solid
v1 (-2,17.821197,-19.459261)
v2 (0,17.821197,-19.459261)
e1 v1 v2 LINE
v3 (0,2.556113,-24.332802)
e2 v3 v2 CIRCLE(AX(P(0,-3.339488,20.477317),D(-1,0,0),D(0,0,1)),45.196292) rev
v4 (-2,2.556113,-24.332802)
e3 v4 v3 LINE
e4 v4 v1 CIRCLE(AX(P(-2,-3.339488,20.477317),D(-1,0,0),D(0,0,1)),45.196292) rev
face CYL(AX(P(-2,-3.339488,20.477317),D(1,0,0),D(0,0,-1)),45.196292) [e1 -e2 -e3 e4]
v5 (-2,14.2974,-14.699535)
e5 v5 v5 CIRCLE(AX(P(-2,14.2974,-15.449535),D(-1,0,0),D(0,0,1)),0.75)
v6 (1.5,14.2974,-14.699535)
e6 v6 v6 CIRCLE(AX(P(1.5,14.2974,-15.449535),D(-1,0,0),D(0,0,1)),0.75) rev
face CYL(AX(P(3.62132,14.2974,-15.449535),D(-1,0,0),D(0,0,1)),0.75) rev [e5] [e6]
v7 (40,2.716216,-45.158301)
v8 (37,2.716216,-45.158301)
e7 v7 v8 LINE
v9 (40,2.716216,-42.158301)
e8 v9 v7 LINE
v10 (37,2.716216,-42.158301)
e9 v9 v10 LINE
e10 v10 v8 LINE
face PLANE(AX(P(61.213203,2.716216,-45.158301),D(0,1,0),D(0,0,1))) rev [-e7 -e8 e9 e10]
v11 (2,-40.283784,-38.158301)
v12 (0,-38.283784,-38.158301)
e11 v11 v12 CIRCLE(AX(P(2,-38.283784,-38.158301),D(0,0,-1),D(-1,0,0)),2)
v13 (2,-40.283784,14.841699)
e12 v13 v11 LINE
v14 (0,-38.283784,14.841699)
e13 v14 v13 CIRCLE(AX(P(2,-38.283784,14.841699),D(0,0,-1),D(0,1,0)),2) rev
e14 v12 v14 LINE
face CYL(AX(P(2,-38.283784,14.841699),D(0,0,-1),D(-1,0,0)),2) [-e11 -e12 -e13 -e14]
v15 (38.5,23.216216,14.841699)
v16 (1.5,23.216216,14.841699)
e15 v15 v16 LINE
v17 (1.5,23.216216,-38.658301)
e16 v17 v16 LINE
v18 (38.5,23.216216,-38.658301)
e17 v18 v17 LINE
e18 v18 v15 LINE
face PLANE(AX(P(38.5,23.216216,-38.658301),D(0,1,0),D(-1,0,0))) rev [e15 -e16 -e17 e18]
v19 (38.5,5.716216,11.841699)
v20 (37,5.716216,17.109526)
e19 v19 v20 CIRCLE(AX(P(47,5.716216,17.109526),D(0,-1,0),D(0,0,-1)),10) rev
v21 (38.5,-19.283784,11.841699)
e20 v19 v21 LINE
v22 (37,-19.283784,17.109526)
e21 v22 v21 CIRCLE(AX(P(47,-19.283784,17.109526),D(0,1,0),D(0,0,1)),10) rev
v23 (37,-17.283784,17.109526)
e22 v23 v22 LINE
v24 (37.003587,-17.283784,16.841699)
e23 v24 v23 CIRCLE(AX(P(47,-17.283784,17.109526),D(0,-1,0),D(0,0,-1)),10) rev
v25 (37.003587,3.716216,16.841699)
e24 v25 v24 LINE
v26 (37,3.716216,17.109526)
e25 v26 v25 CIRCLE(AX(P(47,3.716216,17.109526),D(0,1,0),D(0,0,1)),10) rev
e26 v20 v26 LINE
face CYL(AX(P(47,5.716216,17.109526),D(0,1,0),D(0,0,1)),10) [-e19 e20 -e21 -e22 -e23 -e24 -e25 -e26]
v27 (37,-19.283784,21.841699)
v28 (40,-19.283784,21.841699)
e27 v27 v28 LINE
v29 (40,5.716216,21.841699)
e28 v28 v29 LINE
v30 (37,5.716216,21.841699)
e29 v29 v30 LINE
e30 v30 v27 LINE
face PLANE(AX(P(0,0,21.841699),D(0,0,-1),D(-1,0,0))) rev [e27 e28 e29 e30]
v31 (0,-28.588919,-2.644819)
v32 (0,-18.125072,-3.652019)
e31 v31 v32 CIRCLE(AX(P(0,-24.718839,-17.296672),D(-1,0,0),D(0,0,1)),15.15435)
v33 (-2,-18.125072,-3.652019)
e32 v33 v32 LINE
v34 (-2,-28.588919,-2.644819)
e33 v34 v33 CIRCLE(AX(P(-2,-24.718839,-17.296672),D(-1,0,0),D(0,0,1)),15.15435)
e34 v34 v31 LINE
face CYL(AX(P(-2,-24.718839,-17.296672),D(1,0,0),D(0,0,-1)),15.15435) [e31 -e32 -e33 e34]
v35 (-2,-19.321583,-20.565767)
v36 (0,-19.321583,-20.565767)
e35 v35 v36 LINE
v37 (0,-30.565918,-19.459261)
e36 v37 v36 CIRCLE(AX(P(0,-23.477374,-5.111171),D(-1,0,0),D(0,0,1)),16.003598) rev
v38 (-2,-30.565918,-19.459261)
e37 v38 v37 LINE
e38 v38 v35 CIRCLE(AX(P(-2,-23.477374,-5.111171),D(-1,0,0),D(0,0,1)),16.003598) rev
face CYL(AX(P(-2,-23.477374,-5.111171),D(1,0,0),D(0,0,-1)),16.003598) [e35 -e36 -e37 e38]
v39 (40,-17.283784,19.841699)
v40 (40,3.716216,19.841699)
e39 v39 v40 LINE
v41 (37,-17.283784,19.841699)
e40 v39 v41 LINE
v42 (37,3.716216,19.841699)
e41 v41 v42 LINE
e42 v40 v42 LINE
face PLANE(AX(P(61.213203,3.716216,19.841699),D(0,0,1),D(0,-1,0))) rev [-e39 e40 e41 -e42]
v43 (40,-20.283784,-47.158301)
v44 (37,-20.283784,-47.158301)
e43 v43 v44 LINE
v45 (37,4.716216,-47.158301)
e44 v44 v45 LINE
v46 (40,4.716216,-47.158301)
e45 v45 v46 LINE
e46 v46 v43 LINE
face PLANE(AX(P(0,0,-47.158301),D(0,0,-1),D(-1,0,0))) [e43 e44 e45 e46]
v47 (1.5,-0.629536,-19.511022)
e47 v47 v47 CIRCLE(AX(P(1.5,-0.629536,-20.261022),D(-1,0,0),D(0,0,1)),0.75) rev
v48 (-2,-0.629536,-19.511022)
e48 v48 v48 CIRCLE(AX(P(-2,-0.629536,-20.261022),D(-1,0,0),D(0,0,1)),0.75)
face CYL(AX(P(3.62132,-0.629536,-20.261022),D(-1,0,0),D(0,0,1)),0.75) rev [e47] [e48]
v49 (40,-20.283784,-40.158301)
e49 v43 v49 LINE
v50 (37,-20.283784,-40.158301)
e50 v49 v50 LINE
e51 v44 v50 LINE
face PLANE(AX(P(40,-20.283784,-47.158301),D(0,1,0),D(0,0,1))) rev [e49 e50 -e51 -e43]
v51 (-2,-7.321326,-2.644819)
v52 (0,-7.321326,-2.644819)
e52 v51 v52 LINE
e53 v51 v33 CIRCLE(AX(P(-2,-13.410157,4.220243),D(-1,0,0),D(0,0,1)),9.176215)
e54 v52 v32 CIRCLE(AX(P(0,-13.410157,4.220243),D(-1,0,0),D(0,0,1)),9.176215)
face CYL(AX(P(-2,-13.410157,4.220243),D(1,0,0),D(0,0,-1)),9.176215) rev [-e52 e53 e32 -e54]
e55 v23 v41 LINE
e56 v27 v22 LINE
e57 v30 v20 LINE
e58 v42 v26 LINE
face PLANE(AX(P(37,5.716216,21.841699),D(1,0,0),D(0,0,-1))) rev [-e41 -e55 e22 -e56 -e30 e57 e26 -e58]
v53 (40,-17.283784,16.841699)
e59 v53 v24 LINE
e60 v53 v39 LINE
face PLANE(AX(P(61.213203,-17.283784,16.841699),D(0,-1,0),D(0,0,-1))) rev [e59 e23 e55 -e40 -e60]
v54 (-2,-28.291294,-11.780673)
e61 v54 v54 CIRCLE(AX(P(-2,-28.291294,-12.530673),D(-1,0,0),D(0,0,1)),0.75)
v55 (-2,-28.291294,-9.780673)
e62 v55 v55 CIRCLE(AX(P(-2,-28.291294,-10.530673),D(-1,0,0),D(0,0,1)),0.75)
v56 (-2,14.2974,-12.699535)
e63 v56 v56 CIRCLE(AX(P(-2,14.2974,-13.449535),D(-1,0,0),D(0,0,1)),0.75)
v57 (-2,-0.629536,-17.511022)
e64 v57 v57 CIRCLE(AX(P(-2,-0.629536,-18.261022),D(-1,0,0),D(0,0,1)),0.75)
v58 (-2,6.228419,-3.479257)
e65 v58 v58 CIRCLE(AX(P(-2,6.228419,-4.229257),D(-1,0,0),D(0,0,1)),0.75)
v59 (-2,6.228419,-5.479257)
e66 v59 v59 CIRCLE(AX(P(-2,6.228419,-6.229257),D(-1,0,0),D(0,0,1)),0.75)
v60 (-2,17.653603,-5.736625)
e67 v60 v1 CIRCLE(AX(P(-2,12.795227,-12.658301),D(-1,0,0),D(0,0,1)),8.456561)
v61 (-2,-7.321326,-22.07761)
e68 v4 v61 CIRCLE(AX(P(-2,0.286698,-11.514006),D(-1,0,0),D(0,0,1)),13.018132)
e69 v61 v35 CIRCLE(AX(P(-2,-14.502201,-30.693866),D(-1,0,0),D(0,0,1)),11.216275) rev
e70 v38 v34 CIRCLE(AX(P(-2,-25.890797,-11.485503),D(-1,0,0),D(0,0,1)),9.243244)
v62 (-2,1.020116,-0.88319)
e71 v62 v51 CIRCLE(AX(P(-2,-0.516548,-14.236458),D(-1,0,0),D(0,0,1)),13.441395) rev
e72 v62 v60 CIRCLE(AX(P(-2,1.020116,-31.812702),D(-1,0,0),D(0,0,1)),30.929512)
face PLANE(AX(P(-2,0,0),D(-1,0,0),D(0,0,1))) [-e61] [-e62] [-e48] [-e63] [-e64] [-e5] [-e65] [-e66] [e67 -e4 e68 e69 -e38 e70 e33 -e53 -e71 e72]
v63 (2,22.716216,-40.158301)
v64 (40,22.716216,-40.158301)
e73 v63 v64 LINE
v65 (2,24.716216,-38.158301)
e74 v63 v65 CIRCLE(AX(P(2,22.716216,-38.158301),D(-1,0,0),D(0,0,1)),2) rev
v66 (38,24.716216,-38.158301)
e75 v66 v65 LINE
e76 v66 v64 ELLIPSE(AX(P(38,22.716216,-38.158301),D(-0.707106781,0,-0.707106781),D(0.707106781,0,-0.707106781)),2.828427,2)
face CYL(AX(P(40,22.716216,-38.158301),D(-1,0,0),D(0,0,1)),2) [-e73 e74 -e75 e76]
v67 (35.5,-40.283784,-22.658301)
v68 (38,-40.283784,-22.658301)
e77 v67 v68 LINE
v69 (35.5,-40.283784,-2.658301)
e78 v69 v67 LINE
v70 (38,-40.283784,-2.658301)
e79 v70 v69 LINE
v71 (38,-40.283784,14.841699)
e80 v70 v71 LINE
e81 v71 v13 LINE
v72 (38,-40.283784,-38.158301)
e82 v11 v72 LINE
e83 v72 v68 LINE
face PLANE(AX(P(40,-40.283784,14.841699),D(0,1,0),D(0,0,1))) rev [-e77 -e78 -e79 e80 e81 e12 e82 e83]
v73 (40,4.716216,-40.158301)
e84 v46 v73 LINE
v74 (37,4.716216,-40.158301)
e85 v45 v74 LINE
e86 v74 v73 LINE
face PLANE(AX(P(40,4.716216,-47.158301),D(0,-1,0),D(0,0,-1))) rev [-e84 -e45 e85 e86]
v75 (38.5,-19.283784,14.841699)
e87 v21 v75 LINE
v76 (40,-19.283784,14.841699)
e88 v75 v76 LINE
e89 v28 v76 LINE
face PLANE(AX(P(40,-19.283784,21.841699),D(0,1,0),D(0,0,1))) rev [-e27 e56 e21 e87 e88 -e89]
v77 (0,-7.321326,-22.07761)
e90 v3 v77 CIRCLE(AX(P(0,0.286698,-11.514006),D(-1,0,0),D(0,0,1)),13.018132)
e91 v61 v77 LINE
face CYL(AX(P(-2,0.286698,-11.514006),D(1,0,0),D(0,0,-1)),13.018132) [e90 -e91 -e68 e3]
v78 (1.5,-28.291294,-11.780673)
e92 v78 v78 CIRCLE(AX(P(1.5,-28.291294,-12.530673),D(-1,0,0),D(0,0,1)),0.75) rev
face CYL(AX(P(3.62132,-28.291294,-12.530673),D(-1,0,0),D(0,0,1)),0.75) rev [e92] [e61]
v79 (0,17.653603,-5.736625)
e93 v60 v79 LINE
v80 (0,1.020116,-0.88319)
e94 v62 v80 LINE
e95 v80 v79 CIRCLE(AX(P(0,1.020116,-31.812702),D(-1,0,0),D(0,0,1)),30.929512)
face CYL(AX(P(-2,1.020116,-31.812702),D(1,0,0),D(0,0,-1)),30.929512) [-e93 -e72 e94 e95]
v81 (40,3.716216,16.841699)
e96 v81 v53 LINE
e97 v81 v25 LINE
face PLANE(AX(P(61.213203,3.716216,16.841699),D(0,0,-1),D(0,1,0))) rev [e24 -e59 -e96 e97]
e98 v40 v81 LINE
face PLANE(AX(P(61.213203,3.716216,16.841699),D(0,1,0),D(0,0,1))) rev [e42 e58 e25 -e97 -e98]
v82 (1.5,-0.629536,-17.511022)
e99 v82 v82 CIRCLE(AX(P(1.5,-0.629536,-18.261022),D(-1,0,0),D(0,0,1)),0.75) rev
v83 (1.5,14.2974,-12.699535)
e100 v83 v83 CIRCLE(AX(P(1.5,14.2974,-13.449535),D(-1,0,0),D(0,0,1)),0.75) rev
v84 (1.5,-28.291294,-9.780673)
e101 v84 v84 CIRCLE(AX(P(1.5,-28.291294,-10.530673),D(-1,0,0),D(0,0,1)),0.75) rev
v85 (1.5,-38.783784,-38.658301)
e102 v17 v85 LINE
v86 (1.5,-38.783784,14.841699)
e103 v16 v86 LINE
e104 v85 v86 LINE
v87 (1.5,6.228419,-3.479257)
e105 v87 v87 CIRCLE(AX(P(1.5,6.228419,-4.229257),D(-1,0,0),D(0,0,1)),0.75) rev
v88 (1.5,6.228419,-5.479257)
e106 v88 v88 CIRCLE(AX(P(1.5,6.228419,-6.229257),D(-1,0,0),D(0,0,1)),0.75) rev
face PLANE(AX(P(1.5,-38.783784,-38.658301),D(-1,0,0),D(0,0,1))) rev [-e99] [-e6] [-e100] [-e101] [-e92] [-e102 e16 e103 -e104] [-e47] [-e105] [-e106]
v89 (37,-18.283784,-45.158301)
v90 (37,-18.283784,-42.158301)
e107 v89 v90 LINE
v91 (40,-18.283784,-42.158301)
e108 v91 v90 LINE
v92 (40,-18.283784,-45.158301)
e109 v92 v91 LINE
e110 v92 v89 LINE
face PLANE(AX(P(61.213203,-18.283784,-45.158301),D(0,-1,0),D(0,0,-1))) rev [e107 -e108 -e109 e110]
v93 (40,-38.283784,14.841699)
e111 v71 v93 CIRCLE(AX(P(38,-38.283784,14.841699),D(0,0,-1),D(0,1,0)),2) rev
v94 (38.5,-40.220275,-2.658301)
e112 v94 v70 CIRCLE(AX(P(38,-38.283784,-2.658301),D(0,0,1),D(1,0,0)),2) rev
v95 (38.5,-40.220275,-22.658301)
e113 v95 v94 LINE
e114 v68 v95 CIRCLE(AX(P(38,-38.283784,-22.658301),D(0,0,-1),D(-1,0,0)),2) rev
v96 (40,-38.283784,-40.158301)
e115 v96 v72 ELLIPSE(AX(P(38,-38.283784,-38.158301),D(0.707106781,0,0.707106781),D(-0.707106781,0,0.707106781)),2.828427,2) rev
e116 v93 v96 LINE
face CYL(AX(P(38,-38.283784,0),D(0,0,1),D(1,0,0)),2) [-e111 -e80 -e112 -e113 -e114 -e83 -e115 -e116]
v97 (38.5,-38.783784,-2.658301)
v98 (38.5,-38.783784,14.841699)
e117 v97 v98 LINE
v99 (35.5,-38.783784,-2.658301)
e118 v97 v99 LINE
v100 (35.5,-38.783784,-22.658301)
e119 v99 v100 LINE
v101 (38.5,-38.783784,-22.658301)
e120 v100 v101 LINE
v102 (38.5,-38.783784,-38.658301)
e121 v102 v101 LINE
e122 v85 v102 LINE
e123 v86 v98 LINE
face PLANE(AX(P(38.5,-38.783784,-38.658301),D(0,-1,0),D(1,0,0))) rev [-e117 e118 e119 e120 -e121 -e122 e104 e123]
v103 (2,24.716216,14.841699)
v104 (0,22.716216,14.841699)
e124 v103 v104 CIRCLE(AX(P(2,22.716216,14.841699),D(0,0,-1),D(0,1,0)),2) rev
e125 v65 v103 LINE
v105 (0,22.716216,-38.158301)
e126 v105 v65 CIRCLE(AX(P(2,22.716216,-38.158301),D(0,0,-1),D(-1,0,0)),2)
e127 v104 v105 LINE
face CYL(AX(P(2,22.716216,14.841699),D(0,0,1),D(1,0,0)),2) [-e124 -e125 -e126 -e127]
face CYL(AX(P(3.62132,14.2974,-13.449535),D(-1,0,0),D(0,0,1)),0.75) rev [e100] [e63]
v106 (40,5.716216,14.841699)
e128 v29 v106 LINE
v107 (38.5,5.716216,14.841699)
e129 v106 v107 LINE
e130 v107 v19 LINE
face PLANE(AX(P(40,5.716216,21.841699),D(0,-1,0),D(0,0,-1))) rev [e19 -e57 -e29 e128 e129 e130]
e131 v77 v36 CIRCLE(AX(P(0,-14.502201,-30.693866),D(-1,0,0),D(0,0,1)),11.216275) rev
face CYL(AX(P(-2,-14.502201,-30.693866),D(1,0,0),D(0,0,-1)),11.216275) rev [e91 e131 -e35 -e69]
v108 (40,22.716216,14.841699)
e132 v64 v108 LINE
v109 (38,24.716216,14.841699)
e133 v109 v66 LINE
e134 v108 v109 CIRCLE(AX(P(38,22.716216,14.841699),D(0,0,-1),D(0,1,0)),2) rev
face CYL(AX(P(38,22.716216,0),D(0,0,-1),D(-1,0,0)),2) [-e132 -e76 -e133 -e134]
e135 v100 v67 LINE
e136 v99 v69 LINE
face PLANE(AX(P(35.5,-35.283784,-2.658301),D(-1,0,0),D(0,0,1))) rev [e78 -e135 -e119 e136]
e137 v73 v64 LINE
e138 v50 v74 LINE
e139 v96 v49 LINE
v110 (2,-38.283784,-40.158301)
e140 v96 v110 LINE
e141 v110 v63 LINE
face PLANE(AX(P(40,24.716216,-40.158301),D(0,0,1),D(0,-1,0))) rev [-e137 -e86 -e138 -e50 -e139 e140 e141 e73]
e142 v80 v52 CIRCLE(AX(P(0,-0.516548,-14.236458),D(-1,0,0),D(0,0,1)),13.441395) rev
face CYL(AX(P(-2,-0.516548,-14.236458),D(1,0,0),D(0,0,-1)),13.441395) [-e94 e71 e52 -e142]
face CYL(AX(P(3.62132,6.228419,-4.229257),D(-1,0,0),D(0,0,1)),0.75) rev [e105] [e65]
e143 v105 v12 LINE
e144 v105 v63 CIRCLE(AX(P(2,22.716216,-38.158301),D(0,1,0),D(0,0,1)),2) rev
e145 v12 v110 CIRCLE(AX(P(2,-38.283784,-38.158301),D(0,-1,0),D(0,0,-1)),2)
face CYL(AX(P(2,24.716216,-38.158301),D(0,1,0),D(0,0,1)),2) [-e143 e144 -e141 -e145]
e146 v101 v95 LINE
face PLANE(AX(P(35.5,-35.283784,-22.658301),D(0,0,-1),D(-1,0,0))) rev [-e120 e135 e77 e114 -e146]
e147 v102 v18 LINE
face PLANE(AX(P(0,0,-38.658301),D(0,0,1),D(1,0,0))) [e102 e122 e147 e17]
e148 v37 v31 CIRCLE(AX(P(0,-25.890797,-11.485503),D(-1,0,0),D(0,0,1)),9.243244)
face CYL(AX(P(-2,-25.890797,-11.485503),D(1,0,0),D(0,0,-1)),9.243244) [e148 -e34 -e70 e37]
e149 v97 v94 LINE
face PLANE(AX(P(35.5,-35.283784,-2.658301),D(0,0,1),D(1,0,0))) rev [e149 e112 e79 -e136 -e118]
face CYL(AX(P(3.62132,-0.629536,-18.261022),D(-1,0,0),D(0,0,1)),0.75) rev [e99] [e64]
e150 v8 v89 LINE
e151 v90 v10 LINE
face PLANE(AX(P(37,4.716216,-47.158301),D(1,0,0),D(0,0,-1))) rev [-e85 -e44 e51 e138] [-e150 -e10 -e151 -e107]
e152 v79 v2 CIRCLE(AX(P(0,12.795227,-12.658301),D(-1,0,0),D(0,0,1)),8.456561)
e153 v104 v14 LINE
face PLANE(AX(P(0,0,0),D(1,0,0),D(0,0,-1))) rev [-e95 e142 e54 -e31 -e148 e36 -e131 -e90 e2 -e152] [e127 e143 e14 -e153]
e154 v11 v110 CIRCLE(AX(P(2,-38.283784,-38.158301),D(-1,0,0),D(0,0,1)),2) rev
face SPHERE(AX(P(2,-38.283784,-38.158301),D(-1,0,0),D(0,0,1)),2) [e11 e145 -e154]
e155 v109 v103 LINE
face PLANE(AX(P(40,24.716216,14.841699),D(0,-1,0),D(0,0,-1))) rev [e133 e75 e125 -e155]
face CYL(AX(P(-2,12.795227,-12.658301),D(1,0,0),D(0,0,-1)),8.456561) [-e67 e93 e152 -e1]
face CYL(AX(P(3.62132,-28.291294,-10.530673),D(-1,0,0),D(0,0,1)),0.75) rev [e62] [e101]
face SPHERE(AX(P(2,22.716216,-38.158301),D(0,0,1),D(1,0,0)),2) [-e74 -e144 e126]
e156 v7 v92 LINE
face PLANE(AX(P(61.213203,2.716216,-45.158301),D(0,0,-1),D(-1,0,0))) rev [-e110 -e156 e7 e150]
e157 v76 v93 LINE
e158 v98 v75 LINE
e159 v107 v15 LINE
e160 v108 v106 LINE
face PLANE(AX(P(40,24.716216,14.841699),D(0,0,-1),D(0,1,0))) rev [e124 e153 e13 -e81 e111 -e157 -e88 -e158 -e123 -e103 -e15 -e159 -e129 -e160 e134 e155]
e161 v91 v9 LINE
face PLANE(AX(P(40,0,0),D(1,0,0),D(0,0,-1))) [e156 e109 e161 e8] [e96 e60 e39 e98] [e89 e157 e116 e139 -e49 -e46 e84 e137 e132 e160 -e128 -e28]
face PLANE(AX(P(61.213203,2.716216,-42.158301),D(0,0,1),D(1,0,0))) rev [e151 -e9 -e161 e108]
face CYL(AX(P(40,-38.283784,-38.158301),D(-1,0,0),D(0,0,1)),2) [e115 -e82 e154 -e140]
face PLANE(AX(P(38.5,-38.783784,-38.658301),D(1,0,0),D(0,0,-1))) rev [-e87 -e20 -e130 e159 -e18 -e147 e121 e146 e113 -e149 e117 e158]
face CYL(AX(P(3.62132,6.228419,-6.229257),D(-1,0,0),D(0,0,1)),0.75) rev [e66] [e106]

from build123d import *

# Parameters (mm, degrees)
SKETCH1_W           = 55
SKETCH1_H           = 65
BOSS_EXTRUDE1_DEPTH = 40
SKETCH2_W           = 37
SKETCH2_H           = 62
CUT_EXTRUDE1_DEPTH  = 53.5
FILLET1_R           = 2
FILLET7_R           = 2
BOSS_EXTRUDE2_DEPTH = 2
SKETCH17_R          = 0.75
CUT_EXTRUDE3_DEPTH  = 3.5
SKETCH18_W          = 3
SKETCH18_H          = 25
BOSS_EXTRUDE3_DEPTH = 7
SKETCH19_W          = 3
SKETCH19_H          = 25
BOSS_EXTRUDE4_DEPTH = 7
SKETCH22_W          = 3
SKETCH22_H          = 25
BOSS_EXTRUDE5_DEPTH = 1.5
SKETCH23_W          = 3
SKETCH23_H          = 21
CUT_EXTRUDE4_DEPTH  = 3
FILLET9_R           = 10
SKETCH24_W          = 3
SKETCH24_H          = 20
CUT_EXTRUDE5_DEPTH  = 5


with BuildPart() as part:
    # Sketch1 → Boss-Extrude1 (new body)
    with BuildSketch(Plane(origin=(0, 0, 0), x_dir=(0, 0, -1), z_dir=(1, 0, 0))):
        with Locations((12.658301158, -7.783783784)):
            Rectangle(SKETCH1_W, SKETCH1_H)
    extrude(amount=BOSS_EXTRUDE1_DEPTH)

    # Sketch2 → Cut-Extrude1 (cut)
    with BuildSketch(Plane.XY.offset(14.841698842)):
        with Locations((20, -7.783783784)):
            Rectangle(SKETCH2_W, SKETCH2_H)
    extrude(amount=-CUT_EXTRUDE1_DEPTH, mode=Mode.SUBTRACT)

    # Fillet1
    fillet1_edges = [part.edges().sort_by_distance(p)[0] for p in [
        (40, 24.716216216, -12.658301158),
        (0, -7.783783784, -40.158301158),
        (0, -40.283783784, -12.658301158),
        (20, 24.716216216, -40.158301158),
        (20, -40.283783784, -40.158301158),
        (40, -40.283783784, -12.658301158),
    ]]
    fillet(fillet1_edges, radius=FILLET1_R)

    # Fillet7
    # the kernel refuses this fillet: 2 mm, written as the material it takes off along each edge
    with BuildSketch(Plane(origin=(2, 22.716216216, -38.158301158), x_dir=(-1, 0, 0), z_dir=(0, 1, 0))) as fillet7_piece_1_section:
        Polygon((0, 0), (FILLET7_R, 0), (FILLET7_R, -FILLET7_R), (0, -FILLET7_R), align=None)
    fillet7_piece_1 = extrude(amount=FILLET7_R, mode=Mode.PRIVATE)
    fillet7_piece_1 = fillet7_piece_1 - Plane(origin=(2, 22.716216216, -38.158301158), x_dir=(0.7071067811865475, 0, 0.7071067811865475), z_dir=(0, 1, 0)) * Sphere(FILLET7_R, mode=Mode.PRIVATE)
    add(fillet7_piece_1, mode=Mode.SUBTRACT)
    with BuildSketch(Plane(origin=(0, 24.716216216, 19.841698842), x_dir=(1, 0, 0), z_dir=(0, 0, -1))) as fillet7_piece_2:
        with BuildLine():
            CenterArc((FILLET7_R, FILLET7_R), FILLET7_R, 180, 90)
            Line((0, FILLET7_R), (0, 0))
            Line((0, 0), (FILLET7_R, 0))
        make_face()
    extrude(amount=58, mode=Mode.SUBTRACT)

    # Sketch16 → Boss-Extrude2 (add)
    with BuildSketch(Plane.ZY):
        with BuildLine():
            ThreePointArc((-5.736624698, 17.653603477), (-12.555029292, 21.251157673), (-19.459260578, 17.82119736))
            ThreePointArc((-19.459260578, 17.82119736), (-22.577953623, 10.406366019), (-24.332801521, 2.556112585))
            ThreePointArc((-24.332801521, 2.556112585), (-24.205542572, -2.611001185), (-22.077609894, -7.321326234))
            ThreePointArc((-22.077609894, -7.321326234), (-19.565557127, -13.10020976), (-20.565766521, -19.321583006))
            ThreePointArc((-20.565766521, -19.321583006), (-21.037839736, -25.044648424), (-19.459260578, -30.565918092))
            ThreePointArc((-19.459260578, -30.565918092), (-10.406141283, -35.070804577), (-2.644818813, -28.588918684))
            ThreePointArc((-2.644818813, -28.588918684), (-2.212041027, -23.266864026), (-3.652018787, -18.125071882))
            ThreePointArc((-3.652018787, -18.125071882), (-4.916354141, -12.558379885), (-2.644818813, -7.321326234))
            ThreePointArc((-2.644818813, -7.321326234), (-1.085145754, -3.293973241), (-0.88318994, 1.020116006))
            ThreePointArc((-0.88318994, 1.020116006), (-2.121330664, 9.683670911), (-5.736624698, 17.653603477))
        make_face()
    extrude(amount=BOSS_EXTRUDE2_DEPTH)

    # Sketch17 → Cut-Extrude3 (cut)
    with BuildSketch(Plane.ZY.offset(2)):
        with Locations((-15.44953453, 14.297400207)):
            Circle(SKETCH17_R)
        with Locations((-13.44953453, 14.297400207)):
            Circle(SKETCH17_R)
        with Locations((-4.229257303, 6.228419053)):
            Circle(SKETCH17_R)
        with Locations((-6.229257303, 6.228419053)):
            Circle(SKETCH17_R)
        with Locations((-20.261021777, -0.629536007)):
            Circle(SKETCH17_R)
        with Locations((-18.261021777, -0.629536007)):
            Circle(SKETCH17_R)
        with Locations((-12.530672595, -28.291294223)):
            Circle(SKETCH17_R)
        with Locations((-10.530672595, -28.291294223)):
            Circle(SKETCH17_R)
    extrude(amount=-CUT_EXTRUDE3_DEPTH, mode=Mode.SUBTRACT)

    # Sketch18 → Boss-Extrude3 (add)
    with BuildSketch(Plane(origin=(0, 0, -40.158301158), x_dir=(-1, 0, 0), z_dir=(0, 0, -1))):
        with Locations((-38.5, -7.783783784)):
            Rectangle(SKETCH18_W, SKETCH18_H)
    extrude(amount=BOSS_EXTRUDE3_DEPTH)

    # Sketch19 → Boss-Extrude4 (add)
    with BuildSketch(Plane.XY.offset(14.841698842)):
        with Locations((38.5, -6.783783784)):
            Rectangle(SKETCH19_W, SKETCH19_H)
    extrude(amount=BOSS_EXTRUDE4_DEPTH)

    # Sketch22 → Boss-Extrude5 (add)
    with BuildSketch(Plane.ZY.offset(-38.5)):
        with Locations((13.341698842, -6.783783784)):
            Rectangle(SKETCH22_W, SKETCH22_H)
    extrude(amount=BOSS_EXTRUDE5_DEPTH)

    # Sketch23 → Cut-Extrude4 (cut)
    with BuildSketch(Plane.ZY.offset(-37)):
        with Locations((-43.658301158, -7.783783784)):
            Rectangle(SKETCH23_W, SKETCH23_H)
        with Locations((18.341698842, -6.783783784)):
            Rectangle(SKETCH23_W, SKETCH23_H)
    extrude(amount=-CUT_EXTRUDE4_DEPTH, mode=Mode.SUBTRACT)

    # Fillet9
    # the kernel refuses this fillet: 10 mm, written as the material it takes off along each edge
    with BuildSketch(Plane(origin=(37, 18.885783407, 11.841698842), x_dir=(0, 0, 1), z_dir=(0, -1, 0))) as fillet9_piece_1:
        with BuildLine():
            CenterArc((5.267826876, -10), FILLET9_R, 90, 31.788330617)
            Line((0, -1.5), (-0.105356538, -1.33))
            ThreePointArc((-0.105356538, -1.33), (-0.2, -0.75), (-0.2, 0))
            Line((-0.2, 0), (0, 0.2))
            Line((0, 0.2), (5.267826876, 0.2))
            Line((5.267826876, 0.2), (5.267826876, 0))
        make_face()
    extrude(amount=51.339134382, mode=Mode.SUBTRACT)

    # Sketch24 → Cut-Extrude5 (cut)
    with BuildSketch(Plane.XZ.offset(40.283783784)):
        with Locations((37, -12.658301158)):
            Rectangle(SKETCH24_W, SKETCH24_H)
    extrude(amount=-CUT_EXTRUDE5_DEPTH, mode=Mode.SUBTRACT)


solid = part.part
